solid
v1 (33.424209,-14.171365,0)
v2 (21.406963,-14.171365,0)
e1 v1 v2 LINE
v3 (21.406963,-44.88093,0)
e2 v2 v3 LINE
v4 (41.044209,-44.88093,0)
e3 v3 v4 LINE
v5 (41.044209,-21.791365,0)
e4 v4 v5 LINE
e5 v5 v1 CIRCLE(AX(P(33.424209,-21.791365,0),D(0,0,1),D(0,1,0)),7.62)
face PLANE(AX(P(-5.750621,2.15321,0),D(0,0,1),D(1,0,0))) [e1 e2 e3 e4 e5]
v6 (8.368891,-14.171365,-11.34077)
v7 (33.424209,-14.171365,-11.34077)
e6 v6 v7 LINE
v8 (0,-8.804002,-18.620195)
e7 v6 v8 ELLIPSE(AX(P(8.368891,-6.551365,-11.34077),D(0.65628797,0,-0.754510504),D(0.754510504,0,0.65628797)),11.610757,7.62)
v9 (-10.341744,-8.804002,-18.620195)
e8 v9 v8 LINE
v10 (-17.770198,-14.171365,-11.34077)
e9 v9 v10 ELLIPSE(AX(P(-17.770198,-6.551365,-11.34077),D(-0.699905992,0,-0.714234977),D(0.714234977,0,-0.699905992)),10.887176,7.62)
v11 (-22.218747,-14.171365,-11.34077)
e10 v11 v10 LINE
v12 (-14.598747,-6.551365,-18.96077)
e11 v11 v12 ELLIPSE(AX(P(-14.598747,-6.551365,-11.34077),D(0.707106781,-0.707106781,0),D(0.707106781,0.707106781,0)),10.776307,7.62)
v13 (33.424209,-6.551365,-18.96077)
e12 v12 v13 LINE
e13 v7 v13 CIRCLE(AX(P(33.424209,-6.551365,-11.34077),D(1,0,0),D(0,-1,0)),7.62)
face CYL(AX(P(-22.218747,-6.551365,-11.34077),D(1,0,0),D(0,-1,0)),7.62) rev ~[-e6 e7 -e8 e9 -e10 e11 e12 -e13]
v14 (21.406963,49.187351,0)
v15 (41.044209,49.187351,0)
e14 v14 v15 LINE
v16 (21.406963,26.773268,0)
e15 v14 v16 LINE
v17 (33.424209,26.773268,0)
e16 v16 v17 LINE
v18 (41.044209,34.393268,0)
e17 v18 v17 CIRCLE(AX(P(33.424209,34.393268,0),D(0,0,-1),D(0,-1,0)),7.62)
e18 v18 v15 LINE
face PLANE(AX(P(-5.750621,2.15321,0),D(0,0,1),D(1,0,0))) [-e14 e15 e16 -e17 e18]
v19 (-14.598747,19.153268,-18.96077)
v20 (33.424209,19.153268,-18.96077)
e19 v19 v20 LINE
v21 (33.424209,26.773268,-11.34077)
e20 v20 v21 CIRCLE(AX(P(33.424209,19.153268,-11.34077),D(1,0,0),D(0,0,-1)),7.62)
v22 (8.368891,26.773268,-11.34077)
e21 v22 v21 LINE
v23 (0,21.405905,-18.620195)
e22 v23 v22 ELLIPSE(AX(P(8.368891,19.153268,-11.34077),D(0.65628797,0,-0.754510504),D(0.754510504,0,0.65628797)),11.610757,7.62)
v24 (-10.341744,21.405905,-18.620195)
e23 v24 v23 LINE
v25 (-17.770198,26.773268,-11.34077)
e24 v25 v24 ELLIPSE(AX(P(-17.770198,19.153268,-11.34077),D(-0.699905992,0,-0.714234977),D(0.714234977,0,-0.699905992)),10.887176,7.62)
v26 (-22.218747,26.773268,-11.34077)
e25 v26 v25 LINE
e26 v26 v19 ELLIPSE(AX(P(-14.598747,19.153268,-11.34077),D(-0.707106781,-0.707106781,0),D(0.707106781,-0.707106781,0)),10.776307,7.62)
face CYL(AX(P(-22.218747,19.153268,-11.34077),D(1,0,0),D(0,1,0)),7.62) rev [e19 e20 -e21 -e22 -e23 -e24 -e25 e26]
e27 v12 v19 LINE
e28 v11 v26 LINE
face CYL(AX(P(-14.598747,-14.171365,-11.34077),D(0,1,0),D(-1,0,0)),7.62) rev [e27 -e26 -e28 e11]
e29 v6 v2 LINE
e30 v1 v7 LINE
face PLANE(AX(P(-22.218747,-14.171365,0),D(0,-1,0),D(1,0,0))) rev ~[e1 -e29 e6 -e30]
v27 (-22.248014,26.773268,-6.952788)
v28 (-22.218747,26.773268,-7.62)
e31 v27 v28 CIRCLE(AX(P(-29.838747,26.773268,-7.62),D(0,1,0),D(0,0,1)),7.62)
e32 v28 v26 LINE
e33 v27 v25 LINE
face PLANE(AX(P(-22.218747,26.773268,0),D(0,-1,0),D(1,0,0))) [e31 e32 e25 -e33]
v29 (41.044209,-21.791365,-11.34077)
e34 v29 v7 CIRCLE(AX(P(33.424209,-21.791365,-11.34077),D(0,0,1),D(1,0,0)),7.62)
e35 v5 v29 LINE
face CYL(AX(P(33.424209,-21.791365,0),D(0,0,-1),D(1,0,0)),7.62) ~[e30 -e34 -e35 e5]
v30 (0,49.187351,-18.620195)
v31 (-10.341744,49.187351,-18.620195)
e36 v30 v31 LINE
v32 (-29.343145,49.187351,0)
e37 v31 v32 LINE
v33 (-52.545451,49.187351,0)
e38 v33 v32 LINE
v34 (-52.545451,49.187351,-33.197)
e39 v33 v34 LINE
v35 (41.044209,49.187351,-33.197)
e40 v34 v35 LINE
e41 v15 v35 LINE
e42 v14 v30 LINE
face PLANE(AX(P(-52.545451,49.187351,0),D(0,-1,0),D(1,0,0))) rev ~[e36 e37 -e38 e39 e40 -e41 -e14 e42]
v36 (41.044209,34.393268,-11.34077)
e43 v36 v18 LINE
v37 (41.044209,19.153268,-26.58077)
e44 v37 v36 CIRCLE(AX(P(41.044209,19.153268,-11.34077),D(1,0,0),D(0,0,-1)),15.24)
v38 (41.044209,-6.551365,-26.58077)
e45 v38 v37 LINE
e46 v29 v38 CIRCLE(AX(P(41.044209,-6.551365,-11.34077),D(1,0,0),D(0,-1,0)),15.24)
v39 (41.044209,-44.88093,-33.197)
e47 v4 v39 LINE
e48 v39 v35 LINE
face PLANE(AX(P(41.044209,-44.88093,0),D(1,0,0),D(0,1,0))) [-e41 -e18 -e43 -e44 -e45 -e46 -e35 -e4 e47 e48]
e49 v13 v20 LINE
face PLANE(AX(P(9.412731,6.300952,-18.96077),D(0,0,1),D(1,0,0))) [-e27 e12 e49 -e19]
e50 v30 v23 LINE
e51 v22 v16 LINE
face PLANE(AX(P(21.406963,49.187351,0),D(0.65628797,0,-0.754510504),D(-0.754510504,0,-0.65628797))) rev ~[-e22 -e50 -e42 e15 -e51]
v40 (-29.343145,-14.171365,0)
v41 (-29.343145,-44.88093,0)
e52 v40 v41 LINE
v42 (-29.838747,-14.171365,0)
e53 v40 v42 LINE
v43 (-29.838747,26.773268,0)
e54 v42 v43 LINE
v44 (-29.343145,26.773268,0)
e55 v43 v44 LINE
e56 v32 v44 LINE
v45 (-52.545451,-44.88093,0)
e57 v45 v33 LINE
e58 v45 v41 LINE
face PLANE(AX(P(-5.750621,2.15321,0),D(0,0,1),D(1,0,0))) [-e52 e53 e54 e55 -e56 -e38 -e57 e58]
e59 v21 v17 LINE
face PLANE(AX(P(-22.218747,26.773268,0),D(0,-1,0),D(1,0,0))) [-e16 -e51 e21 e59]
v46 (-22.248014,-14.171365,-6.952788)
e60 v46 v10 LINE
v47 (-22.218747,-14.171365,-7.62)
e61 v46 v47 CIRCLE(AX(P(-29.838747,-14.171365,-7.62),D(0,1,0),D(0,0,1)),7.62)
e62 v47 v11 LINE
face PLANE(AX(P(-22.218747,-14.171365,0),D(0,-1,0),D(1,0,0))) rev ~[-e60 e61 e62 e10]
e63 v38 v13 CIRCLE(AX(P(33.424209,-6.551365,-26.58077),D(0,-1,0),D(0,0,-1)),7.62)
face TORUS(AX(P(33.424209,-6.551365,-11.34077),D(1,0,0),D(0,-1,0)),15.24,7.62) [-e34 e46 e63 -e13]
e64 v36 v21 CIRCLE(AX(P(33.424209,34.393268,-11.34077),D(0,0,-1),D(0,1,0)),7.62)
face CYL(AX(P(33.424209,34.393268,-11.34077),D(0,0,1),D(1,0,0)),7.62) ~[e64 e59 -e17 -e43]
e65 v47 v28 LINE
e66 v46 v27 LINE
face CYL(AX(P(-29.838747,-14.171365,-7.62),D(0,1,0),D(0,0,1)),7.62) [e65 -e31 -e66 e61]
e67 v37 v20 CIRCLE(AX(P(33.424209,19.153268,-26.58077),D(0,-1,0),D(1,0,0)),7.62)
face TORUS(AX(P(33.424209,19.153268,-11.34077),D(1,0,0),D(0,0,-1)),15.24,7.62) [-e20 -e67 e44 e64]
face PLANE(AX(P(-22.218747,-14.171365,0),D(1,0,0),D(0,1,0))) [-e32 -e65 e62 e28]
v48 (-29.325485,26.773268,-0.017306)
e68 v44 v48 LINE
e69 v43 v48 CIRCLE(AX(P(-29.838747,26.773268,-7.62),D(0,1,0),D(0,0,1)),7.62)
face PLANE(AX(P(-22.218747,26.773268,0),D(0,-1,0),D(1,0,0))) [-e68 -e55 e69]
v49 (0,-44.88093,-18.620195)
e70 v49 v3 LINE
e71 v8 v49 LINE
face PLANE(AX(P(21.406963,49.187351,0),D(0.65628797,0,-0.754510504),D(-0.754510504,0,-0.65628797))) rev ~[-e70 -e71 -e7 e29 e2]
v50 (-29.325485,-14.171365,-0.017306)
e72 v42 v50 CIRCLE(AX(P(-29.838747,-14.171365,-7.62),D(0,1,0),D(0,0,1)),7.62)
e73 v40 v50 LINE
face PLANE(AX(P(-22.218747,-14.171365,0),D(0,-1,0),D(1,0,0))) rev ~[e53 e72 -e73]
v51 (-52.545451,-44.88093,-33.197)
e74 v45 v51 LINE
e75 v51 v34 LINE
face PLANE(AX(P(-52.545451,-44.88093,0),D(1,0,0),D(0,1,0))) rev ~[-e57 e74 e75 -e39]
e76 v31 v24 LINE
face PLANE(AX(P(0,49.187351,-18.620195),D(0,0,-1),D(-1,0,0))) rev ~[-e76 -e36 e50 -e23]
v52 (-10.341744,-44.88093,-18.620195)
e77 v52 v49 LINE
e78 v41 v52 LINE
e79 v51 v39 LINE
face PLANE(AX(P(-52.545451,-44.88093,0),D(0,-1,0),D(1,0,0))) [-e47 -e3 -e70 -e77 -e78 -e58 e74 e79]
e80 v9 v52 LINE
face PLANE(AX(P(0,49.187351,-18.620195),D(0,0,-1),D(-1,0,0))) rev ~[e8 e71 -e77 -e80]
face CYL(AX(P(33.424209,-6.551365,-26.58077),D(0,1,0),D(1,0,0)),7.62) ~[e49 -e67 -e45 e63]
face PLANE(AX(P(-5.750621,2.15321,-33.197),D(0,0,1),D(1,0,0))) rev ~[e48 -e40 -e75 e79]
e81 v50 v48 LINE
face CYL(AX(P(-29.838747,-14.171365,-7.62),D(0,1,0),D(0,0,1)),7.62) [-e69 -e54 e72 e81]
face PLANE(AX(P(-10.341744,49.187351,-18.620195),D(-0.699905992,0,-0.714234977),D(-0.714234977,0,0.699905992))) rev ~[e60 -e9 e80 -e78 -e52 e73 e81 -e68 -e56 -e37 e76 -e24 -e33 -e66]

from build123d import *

# Parameters (mm, degrees)
F0_W     = 93.5896597803
F0_H     = 94.0682813525
F1_DEPTH = 33.197
F2_W     = 63.2629562169
F2_H     = 40.9446330741
F3_DEPTH = 18.96077
F4_F1_R  = 7.62
F4_F2_R  = 7.62
F6_DEPTH = 123.1075


with BuildPart() as f1:
    # F0 (on Top) → F1 (new body)
    with BuildSketch(Plane.XY):
        with Locations((-5.7506207377, 2.1532103419)):
            Rectangle(F0_W, F0_H)
    extrude(amount=-F1_DEPTH)

    # F2 (on face) → F3 (cut)
    with BuildSketch(Plane.XY):
        with Locations((9.412731044, 6.3009518199)):
            Rectangle(F2_W, F2_H)
    extrude(amount=-F3_DEPTH, mode=Mode.SUBTRACT)

    # F4: fillet of radius 7.62 on 5 edges, made by hand

    # F4_f1
    f4_f1_edges = [f1.edges().sort_by_distance(p)[0] for p in [
        (9.412731044, -14.1713647172, -18.96077),
        (9.412731044, 26.7732683569, -18.96077),
        (-22.2187470645, 6.3009518199, -18.96077),
    ]]
    fillet(f4_f1_edges, radius=F4_F1_R)

    # F4_f2
    f4_f2_edges = [f1.edges().sort_by_distance(p)[0] for p in [
        (41.0442091525, 6.3009518199, -18.96077),
        (-22.2187470645, 6.3009518199, 0),
        (41.0442091525, -11.9395183898, -16.7289236726),
        (41.0442091525, 24.5414220296, -16.7289236726),
    ]]
    fillet(f4_f2_edges, radius=F4_F2_R)

    # F5 (on face) → F6 (cut)
    with BuildSketch(Plane(origin=(0, 49.1873510182, 0), x_dir=(-1, 0, 0), z_dir=(0, 1, 0))):
        Polygon((29.3431449682, 0), (-21.4069634676, 0), (0, -18.6201948673), (10.3417439386, -18.6201948673), align=None)
    extrude(amount=-F6_DEPTH, mode=Mode.SUBTRACT)


solid = f1.part
